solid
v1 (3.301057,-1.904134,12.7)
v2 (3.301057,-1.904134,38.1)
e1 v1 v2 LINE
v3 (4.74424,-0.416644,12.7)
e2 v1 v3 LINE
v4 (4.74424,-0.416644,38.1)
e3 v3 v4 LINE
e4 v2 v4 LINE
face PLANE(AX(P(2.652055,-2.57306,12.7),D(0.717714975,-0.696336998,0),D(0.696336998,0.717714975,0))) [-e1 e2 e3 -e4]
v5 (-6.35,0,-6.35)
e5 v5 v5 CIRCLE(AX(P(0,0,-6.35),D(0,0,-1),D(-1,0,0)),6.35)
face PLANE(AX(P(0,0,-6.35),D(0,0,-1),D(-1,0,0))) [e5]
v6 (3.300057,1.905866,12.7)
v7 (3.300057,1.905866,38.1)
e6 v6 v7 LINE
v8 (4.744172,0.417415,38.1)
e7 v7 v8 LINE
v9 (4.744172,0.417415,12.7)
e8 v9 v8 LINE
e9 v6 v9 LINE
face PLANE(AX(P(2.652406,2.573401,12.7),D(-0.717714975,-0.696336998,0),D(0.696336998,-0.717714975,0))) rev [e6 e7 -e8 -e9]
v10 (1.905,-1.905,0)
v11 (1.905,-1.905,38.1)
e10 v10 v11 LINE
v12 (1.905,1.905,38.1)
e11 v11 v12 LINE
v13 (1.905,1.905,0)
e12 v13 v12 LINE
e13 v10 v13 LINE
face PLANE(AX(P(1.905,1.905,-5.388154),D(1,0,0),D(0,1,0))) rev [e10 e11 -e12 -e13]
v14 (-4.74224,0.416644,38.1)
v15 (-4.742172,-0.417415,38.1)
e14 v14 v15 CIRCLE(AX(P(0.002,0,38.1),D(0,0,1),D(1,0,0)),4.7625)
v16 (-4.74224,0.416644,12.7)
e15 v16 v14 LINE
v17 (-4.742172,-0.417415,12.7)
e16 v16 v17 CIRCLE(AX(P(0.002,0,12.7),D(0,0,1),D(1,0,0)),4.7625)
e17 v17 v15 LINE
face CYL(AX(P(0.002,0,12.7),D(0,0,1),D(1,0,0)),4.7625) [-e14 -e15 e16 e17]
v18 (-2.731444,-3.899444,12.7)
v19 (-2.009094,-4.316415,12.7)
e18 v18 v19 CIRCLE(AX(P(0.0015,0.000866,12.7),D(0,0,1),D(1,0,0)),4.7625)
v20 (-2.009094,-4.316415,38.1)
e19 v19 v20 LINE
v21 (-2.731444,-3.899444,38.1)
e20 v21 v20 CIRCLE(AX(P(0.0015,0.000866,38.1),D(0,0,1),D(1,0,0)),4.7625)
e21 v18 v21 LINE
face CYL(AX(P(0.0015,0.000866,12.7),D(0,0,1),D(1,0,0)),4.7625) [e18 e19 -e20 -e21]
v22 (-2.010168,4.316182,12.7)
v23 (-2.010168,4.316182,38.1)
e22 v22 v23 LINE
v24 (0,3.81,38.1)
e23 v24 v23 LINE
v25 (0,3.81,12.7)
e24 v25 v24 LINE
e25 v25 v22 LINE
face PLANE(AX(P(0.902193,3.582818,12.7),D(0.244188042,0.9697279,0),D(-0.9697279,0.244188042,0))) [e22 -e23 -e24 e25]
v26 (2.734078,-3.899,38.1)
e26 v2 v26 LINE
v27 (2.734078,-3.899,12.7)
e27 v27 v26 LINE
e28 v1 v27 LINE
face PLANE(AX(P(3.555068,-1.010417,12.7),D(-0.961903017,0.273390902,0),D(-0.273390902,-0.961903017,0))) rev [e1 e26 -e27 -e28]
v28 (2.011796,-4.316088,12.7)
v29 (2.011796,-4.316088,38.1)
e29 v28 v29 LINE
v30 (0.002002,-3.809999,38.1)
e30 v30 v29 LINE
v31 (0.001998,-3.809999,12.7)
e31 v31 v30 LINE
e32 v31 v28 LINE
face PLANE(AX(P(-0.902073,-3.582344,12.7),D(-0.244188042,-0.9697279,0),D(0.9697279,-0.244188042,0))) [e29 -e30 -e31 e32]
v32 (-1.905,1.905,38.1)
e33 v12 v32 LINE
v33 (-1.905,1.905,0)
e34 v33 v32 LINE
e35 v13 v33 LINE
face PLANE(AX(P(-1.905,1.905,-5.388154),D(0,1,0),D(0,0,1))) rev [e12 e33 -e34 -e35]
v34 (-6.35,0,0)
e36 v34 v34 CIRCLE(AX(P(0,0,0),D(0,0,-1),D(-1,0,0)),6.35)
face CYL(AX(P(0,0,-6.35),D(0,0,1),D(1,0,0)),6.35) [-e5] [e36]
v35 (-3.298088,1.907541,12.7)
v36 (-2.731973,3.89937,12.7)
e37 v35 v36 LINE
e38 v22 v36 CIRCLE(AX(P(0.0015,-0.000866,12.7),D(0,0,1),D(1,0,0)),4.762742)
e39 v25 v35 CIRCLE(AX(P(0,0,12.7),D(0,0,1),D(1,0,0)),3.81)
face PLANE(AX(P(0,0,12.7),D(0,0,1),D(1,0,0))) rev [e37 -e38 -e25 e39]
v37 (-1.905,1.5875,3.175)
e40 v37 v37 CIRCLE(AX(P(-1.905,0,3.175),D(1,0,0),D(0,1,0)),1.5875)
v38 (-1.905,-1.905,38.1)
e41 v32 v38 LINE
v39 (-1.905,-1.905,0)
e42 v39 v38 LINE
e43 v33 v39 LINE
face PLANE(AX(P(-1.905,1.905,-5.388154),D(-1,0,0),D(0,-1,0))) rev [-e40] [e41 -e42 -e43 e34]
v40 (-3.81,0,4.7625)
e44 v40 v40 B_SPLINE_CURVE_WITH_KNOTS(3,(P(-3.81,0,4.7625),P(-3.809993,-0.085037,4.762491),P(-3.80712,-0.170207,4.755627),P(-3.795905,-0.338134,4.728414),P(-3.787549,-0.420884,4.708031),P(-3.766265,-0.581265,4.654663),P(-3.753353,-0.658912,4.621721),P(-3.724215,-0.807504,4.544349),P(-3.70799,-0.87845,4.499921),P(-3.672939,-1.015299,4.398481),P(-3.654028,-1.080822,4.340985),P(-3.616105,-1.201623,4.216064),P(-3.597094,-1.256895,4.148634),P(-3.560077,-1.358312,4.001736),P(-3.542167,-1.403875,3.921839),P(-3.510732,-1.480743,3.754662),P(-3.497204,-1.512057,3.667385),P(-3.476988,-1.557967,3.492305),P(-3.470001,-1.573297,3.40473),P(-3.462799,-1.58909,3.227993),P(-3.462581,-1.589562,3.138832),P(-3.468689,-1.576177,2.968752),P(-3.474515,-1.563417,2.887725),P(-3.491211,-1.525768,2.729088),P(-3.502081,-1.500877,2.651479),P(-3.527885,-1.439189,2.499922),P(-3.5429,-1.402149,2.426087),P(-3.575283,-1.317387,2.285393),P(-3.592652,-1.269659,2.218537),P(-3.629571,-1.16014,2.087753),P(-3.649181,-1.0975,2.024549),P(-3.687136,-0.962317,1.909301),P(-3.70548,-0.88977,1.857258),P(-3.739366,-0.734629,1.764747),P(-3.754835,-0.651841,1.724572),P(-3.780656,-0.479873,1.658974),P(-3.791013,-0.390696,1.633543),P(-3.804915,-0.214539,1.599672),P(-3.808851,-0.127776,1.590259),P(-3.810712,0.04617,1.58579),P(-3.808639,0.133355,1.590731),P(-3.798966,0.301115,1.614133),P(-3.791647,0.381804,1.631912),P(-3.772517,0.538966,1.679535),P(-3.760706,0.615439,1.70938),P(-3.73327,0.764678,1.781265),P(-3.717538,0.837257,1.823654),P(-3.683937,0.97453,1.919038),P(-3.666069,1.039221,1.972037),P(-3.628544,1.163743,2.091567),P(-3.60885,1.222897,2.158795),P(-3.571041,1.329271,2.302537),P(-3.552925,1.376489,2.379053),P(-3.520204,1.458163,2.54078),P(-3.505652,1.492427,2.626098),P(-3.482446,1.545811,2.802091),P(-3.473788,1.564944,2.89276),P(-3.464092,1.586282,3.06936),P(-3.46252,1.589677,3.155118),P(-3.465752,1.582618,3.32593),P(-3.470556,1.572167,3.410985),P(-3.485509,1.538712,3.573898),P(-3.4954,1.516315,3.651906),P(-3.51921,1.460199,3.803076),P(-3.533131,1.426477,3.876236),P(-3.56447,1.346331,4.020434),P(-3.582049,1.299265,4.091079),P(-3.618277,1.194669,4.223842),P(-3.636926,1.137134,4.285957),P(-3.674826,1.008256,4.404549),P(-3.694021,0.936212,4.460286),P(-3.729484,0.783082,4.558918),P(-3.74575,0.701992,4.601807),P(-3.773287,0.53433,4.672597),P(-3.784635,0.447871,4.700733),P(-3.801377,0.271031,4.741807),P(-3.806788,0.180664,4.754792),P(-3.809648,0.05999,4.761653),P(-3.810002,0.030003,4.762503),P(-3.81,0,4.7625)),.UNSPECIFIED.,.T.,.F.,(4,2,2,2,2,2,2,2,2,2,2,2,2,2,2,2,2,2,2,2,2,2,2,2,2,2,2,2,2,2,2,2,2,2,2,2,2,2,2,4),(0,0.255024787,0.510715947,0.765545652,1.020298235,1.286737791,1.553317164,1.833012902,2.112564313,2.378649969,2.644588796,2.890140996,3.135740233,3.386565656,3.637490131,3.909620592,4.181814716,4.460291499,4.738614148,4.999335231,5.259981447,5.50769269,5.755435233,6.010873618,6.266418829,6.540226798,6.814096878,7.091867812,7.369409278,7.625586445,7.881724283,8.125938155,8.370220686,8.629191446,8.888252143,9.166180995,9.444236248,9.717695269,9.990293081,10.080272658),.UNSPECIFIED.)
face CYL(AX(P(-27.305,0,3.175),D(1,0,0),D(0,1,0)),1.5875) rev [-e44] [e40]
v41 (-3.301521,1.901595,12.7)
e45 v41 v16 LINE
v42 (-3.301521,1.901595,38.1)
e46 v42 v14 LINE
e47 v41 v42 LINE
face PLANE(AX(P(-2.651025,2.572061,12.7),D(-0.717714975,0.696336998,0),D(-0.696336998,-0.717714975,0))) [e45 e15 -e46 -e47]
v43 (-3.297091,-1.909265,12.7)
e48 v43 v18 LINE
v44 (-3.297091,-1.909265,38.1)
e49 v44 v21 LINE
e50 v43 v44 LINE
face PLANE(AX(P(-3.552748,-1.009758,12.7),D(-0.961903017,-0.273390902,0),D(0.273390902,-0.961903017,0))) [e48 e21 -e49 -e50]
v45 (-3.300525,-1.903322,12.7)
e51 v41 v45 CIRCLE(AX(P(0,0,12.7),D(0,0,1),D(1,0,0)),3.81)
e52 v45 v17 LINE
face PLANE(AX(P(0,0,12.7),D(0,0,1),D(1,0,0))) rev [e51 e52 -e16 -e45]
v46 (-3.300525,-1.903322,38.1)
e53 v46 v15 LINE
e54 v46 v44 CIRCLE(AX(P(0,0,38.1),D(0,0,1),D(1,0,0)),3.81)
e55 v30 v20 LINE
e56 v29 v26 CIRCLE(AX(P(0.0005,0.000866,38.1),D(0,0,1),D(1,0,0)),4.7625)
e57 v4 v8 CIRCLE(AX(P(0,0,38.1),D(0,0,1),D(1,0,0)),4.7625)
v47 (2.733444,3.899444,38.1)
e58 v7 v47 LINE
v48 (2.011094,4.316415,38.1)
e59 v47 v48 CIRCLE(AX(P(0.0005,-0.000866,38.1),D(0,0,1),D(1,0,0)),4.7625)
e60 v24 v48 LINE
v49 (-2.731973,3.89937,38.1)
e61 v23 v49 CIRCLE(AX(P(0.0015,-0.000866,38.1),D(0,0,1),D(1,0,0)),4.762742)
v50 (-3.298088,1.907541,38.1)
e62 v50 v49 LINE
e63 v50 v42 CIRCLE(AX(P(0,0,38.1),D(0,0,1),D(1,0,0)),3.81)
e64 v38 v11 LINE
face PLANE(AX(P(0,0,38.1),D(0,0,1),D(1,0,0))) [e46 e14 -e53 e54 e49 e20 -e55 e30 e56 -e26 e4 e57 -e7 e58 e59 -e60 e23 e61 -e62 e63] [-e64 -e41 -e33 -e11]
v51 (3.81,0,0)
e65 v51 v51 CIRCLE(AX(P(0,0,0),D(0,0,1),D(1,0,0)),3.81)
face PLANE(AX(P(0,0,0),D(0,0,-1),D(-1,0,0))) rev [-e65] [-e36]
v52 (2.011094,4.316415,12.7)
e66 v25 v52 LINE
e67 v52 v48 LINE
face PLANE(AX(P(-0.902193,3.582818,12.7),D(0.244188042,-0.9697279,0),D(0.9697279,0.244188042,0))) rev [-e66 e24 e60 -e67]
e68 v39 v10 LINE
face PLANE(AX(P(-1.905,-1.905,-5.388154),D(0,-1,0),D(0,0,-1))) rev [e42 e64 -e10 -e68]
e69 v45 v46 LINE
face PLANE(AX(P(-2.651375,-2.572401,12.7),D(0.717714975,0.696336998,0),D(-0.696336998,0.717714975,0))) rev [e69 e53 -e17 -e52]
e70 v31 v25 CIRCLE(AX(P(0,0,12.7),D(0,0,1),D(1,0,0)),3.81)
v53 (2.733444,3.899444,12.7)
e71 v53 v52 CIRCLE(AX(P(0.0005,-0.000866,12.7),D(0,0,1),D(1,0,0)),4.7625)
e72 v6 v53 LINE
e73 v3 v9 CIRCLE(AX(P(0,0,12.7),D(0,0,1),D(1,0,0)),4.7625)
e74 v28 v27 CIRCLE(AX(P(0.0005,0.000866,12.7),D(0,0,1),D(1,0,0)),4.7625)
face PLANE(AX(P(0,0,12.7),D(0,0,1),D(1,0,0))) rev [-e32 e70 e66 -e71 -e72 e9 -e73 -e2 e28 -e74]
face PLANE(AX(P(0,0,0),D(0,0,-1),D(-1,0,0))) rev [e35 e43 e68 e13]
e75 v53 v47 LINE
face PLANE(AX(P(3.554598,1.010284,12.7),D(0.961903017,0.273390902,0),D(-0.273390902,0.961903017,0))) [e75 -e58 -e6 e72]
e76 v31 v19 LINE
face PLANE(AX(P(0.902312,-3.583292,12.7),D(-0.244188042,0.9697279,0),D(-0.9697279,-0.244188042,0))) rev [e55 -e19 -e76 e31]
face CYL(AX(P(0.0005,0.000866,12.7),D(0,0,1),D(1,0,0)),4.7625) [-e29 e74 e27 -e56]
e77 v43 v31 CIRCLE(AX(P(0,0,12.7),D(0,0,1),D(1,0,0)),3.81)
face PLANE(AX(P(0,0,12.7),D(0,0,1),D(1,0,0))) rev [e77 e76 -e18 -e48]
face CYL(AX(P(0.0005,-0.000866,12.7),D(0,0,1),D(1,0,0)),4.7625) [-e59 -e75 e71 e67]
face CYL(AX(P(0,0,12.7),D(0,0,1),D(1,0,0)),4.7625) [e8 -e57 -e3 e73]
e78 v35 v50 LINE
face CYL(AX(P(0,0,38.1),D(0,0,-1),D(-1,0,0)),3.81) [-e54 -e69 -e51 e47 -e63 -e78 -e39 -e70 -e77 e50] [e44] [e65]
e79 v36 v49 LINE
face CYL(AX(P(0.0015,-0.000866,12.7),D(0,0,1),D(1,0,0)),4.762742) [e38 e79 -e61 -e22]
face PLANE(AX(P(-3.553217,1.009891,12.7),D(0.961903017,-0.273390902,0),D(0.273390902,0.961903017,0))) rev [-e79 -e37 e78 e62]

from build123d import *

# Parameters (mm, degrees)
SKETCH1_R           = 3.81
BOSS_EXTRUDE1_DEPTH = 38.1
SKETCH2_R           = 6.35
BOSS_EXTRUDE2_DEPTH = 6.35
SKETCH6_R           = 2.8575
BOSS_EXTRUDE3_DEPTH = 2.54
SKETCH14_W          = 3.81
SKETCH14_H          = 3.81
CUT_EXTRUDE1_DEPTH  = 38.1
BOSS_EXTRUDE5_START = -25.4
BOSS_EXTRUDE5_DEPTH = 25.4
SKETCH16_R          = 1.5875
CUT_EXTRUDE2_DEPTH  = 25.4


# Read off the part's stored shape, not the designer's step: Boss-Extrude5
with BuildPart() as part:
    # Sketch1 → Boss-Extrude1 (new body)
    with BuildSketch(Plane.XY):
        with Locations(Location((0, 0, 0), (0, 0, 180))):
            Circle(SKETCH1_R)
    extrude(amount=BOSS_EXTRUDE1_DEPTH)

    # Sketch2 → Boss-Extrude2 (add)
    with BuildSketch(Plane(origin=(0, 0, 0), x_dir=(-1, 0, 0), z_dir=(0, 0, -1))):
        Circle(SKETCH2_R)
    extrude(amount=BOSS_EXTRUDE2_DEPTH)

    # Sketch6 → Boss-Extrude3 (add)
    with BuildSketch(Plane.XY.offset(38.1)):
        Circle(SKETCH6_R)
    extrude(amount=-BOSS_EXTRUDE3_DEPTH)

    # Sketch14 → Cut-Extrude1 (cut)
    with BuildSketch(Plane.XY.offset(38.1)):
        Rectangle(SKETCH14_W, SKETCH14_H)
    extrude(amount=-CUT_EXTRUDE1_DEPTH, mode=Mode.SUBTRACT)

    # Boss-Extrude5 outline → Boss-Extrude5 (add)
    with BuildSketch(Plane.XY.offset(38.1).offset(BOSS_EXTRUDE5_START)):
        with BuildLine():
            ThreePointArc((-3.298088459, 1.907540961), (-1.903729096, 3.300290219), (0, 3.81))
            Line((0, 3.81), (-2.010168305, 4.316182263))
            ThreePointArc((-2.010168305, 4.316182263), (-2.380206411, 4.123596348), (-2.731973317, 3.899369726))
            Line((-2.731973317, 3.899369726), (-3.298088459, 1.907540961))
        make_face()
        with BuildLine():
            Line((2.011093908, 4.31641534), (0, 3.81))
            ThreePointArc((0, 3.81), (3.809999869, 0.001000002), (0.002000005, -3.809999475))
            Line((0.002000005, -3.809999475), (2.011795704, -4.316088438))
            ThreePointArc((2.011795704, -4.316088438), (2.38208523, -4.123386397), (2.734078384, -3.899000058))
            Line((2.734078384, -3.899000058), (3.301056788, -1.904133975))
            Line((3.301056788, -1.904133975), (4.744240085, -0.416644057))
            ThreePointArc((4.744240085, -0.416644057), (4.762499984, 0.000387099), (4.744172292, 0.417415282))
            Line((4.744172292, 0.417415282), (3.300056788, 1.905866025))
            Line((3.300056788, 1.905866025), (2.73344438, 3.899444381))
            ThreePointArc((2.73344438, 3.899444381), (2.381414754, 4.123773496), (2.011093908, 4.31641534))
        make_face()
        with BuildLine():
            Line((-2.009093908, -4.31641534), (0.002000005, -3.809999475))
            ThreePointArc((0.002000005, -3.809999475), (-1.901999931, -3.301287062), (-3.29709076, -1.909264917))
            Line((-3.29709076, -1.909264917), (-2.73144438, -3.899444381))
            ThreePointArc((-2.73144438, -3.899444381), (-2.379414754, -4.123773496), (-2.009093908, -4.31641534))
        make_face()
        with BuildLine():
            ThreePointArc((-3.300524979, -1.90332206), (-3.80999987, -0.000996951), (-3.3015206, 1.901594523))
            Line((-3.3015206, 1.901594523), (-4.742240085, 0.416644057))
            ThreePointArc((-4.742240085, 0.416644057), (-4.760499984, -0.000387099), (-4.742172292, -0.417415282))
            Line((-4.742172292, -0.417415282), (-3.300524979, -1.90332206))
        make_face()
    extrude(amount=BOSS_EXTRUDE5_DEPTH)

    # Sketch16 → Cut-Extrude2 (cut)
    with BuildSketch(Plane(origin=(-1.905, 0, 0), x_dir=(0, 0, -1), z_dir=(1, 0, 0))):
        with Locations(Location((-3.175, 0, 0), (0, 0, 90))):
            Circle(SKETCH16_R)
    extrude(amount=-CUT_EXTRUDE2_DEPTH, mode=Mode.SUBTRACT)


solid = part.part
